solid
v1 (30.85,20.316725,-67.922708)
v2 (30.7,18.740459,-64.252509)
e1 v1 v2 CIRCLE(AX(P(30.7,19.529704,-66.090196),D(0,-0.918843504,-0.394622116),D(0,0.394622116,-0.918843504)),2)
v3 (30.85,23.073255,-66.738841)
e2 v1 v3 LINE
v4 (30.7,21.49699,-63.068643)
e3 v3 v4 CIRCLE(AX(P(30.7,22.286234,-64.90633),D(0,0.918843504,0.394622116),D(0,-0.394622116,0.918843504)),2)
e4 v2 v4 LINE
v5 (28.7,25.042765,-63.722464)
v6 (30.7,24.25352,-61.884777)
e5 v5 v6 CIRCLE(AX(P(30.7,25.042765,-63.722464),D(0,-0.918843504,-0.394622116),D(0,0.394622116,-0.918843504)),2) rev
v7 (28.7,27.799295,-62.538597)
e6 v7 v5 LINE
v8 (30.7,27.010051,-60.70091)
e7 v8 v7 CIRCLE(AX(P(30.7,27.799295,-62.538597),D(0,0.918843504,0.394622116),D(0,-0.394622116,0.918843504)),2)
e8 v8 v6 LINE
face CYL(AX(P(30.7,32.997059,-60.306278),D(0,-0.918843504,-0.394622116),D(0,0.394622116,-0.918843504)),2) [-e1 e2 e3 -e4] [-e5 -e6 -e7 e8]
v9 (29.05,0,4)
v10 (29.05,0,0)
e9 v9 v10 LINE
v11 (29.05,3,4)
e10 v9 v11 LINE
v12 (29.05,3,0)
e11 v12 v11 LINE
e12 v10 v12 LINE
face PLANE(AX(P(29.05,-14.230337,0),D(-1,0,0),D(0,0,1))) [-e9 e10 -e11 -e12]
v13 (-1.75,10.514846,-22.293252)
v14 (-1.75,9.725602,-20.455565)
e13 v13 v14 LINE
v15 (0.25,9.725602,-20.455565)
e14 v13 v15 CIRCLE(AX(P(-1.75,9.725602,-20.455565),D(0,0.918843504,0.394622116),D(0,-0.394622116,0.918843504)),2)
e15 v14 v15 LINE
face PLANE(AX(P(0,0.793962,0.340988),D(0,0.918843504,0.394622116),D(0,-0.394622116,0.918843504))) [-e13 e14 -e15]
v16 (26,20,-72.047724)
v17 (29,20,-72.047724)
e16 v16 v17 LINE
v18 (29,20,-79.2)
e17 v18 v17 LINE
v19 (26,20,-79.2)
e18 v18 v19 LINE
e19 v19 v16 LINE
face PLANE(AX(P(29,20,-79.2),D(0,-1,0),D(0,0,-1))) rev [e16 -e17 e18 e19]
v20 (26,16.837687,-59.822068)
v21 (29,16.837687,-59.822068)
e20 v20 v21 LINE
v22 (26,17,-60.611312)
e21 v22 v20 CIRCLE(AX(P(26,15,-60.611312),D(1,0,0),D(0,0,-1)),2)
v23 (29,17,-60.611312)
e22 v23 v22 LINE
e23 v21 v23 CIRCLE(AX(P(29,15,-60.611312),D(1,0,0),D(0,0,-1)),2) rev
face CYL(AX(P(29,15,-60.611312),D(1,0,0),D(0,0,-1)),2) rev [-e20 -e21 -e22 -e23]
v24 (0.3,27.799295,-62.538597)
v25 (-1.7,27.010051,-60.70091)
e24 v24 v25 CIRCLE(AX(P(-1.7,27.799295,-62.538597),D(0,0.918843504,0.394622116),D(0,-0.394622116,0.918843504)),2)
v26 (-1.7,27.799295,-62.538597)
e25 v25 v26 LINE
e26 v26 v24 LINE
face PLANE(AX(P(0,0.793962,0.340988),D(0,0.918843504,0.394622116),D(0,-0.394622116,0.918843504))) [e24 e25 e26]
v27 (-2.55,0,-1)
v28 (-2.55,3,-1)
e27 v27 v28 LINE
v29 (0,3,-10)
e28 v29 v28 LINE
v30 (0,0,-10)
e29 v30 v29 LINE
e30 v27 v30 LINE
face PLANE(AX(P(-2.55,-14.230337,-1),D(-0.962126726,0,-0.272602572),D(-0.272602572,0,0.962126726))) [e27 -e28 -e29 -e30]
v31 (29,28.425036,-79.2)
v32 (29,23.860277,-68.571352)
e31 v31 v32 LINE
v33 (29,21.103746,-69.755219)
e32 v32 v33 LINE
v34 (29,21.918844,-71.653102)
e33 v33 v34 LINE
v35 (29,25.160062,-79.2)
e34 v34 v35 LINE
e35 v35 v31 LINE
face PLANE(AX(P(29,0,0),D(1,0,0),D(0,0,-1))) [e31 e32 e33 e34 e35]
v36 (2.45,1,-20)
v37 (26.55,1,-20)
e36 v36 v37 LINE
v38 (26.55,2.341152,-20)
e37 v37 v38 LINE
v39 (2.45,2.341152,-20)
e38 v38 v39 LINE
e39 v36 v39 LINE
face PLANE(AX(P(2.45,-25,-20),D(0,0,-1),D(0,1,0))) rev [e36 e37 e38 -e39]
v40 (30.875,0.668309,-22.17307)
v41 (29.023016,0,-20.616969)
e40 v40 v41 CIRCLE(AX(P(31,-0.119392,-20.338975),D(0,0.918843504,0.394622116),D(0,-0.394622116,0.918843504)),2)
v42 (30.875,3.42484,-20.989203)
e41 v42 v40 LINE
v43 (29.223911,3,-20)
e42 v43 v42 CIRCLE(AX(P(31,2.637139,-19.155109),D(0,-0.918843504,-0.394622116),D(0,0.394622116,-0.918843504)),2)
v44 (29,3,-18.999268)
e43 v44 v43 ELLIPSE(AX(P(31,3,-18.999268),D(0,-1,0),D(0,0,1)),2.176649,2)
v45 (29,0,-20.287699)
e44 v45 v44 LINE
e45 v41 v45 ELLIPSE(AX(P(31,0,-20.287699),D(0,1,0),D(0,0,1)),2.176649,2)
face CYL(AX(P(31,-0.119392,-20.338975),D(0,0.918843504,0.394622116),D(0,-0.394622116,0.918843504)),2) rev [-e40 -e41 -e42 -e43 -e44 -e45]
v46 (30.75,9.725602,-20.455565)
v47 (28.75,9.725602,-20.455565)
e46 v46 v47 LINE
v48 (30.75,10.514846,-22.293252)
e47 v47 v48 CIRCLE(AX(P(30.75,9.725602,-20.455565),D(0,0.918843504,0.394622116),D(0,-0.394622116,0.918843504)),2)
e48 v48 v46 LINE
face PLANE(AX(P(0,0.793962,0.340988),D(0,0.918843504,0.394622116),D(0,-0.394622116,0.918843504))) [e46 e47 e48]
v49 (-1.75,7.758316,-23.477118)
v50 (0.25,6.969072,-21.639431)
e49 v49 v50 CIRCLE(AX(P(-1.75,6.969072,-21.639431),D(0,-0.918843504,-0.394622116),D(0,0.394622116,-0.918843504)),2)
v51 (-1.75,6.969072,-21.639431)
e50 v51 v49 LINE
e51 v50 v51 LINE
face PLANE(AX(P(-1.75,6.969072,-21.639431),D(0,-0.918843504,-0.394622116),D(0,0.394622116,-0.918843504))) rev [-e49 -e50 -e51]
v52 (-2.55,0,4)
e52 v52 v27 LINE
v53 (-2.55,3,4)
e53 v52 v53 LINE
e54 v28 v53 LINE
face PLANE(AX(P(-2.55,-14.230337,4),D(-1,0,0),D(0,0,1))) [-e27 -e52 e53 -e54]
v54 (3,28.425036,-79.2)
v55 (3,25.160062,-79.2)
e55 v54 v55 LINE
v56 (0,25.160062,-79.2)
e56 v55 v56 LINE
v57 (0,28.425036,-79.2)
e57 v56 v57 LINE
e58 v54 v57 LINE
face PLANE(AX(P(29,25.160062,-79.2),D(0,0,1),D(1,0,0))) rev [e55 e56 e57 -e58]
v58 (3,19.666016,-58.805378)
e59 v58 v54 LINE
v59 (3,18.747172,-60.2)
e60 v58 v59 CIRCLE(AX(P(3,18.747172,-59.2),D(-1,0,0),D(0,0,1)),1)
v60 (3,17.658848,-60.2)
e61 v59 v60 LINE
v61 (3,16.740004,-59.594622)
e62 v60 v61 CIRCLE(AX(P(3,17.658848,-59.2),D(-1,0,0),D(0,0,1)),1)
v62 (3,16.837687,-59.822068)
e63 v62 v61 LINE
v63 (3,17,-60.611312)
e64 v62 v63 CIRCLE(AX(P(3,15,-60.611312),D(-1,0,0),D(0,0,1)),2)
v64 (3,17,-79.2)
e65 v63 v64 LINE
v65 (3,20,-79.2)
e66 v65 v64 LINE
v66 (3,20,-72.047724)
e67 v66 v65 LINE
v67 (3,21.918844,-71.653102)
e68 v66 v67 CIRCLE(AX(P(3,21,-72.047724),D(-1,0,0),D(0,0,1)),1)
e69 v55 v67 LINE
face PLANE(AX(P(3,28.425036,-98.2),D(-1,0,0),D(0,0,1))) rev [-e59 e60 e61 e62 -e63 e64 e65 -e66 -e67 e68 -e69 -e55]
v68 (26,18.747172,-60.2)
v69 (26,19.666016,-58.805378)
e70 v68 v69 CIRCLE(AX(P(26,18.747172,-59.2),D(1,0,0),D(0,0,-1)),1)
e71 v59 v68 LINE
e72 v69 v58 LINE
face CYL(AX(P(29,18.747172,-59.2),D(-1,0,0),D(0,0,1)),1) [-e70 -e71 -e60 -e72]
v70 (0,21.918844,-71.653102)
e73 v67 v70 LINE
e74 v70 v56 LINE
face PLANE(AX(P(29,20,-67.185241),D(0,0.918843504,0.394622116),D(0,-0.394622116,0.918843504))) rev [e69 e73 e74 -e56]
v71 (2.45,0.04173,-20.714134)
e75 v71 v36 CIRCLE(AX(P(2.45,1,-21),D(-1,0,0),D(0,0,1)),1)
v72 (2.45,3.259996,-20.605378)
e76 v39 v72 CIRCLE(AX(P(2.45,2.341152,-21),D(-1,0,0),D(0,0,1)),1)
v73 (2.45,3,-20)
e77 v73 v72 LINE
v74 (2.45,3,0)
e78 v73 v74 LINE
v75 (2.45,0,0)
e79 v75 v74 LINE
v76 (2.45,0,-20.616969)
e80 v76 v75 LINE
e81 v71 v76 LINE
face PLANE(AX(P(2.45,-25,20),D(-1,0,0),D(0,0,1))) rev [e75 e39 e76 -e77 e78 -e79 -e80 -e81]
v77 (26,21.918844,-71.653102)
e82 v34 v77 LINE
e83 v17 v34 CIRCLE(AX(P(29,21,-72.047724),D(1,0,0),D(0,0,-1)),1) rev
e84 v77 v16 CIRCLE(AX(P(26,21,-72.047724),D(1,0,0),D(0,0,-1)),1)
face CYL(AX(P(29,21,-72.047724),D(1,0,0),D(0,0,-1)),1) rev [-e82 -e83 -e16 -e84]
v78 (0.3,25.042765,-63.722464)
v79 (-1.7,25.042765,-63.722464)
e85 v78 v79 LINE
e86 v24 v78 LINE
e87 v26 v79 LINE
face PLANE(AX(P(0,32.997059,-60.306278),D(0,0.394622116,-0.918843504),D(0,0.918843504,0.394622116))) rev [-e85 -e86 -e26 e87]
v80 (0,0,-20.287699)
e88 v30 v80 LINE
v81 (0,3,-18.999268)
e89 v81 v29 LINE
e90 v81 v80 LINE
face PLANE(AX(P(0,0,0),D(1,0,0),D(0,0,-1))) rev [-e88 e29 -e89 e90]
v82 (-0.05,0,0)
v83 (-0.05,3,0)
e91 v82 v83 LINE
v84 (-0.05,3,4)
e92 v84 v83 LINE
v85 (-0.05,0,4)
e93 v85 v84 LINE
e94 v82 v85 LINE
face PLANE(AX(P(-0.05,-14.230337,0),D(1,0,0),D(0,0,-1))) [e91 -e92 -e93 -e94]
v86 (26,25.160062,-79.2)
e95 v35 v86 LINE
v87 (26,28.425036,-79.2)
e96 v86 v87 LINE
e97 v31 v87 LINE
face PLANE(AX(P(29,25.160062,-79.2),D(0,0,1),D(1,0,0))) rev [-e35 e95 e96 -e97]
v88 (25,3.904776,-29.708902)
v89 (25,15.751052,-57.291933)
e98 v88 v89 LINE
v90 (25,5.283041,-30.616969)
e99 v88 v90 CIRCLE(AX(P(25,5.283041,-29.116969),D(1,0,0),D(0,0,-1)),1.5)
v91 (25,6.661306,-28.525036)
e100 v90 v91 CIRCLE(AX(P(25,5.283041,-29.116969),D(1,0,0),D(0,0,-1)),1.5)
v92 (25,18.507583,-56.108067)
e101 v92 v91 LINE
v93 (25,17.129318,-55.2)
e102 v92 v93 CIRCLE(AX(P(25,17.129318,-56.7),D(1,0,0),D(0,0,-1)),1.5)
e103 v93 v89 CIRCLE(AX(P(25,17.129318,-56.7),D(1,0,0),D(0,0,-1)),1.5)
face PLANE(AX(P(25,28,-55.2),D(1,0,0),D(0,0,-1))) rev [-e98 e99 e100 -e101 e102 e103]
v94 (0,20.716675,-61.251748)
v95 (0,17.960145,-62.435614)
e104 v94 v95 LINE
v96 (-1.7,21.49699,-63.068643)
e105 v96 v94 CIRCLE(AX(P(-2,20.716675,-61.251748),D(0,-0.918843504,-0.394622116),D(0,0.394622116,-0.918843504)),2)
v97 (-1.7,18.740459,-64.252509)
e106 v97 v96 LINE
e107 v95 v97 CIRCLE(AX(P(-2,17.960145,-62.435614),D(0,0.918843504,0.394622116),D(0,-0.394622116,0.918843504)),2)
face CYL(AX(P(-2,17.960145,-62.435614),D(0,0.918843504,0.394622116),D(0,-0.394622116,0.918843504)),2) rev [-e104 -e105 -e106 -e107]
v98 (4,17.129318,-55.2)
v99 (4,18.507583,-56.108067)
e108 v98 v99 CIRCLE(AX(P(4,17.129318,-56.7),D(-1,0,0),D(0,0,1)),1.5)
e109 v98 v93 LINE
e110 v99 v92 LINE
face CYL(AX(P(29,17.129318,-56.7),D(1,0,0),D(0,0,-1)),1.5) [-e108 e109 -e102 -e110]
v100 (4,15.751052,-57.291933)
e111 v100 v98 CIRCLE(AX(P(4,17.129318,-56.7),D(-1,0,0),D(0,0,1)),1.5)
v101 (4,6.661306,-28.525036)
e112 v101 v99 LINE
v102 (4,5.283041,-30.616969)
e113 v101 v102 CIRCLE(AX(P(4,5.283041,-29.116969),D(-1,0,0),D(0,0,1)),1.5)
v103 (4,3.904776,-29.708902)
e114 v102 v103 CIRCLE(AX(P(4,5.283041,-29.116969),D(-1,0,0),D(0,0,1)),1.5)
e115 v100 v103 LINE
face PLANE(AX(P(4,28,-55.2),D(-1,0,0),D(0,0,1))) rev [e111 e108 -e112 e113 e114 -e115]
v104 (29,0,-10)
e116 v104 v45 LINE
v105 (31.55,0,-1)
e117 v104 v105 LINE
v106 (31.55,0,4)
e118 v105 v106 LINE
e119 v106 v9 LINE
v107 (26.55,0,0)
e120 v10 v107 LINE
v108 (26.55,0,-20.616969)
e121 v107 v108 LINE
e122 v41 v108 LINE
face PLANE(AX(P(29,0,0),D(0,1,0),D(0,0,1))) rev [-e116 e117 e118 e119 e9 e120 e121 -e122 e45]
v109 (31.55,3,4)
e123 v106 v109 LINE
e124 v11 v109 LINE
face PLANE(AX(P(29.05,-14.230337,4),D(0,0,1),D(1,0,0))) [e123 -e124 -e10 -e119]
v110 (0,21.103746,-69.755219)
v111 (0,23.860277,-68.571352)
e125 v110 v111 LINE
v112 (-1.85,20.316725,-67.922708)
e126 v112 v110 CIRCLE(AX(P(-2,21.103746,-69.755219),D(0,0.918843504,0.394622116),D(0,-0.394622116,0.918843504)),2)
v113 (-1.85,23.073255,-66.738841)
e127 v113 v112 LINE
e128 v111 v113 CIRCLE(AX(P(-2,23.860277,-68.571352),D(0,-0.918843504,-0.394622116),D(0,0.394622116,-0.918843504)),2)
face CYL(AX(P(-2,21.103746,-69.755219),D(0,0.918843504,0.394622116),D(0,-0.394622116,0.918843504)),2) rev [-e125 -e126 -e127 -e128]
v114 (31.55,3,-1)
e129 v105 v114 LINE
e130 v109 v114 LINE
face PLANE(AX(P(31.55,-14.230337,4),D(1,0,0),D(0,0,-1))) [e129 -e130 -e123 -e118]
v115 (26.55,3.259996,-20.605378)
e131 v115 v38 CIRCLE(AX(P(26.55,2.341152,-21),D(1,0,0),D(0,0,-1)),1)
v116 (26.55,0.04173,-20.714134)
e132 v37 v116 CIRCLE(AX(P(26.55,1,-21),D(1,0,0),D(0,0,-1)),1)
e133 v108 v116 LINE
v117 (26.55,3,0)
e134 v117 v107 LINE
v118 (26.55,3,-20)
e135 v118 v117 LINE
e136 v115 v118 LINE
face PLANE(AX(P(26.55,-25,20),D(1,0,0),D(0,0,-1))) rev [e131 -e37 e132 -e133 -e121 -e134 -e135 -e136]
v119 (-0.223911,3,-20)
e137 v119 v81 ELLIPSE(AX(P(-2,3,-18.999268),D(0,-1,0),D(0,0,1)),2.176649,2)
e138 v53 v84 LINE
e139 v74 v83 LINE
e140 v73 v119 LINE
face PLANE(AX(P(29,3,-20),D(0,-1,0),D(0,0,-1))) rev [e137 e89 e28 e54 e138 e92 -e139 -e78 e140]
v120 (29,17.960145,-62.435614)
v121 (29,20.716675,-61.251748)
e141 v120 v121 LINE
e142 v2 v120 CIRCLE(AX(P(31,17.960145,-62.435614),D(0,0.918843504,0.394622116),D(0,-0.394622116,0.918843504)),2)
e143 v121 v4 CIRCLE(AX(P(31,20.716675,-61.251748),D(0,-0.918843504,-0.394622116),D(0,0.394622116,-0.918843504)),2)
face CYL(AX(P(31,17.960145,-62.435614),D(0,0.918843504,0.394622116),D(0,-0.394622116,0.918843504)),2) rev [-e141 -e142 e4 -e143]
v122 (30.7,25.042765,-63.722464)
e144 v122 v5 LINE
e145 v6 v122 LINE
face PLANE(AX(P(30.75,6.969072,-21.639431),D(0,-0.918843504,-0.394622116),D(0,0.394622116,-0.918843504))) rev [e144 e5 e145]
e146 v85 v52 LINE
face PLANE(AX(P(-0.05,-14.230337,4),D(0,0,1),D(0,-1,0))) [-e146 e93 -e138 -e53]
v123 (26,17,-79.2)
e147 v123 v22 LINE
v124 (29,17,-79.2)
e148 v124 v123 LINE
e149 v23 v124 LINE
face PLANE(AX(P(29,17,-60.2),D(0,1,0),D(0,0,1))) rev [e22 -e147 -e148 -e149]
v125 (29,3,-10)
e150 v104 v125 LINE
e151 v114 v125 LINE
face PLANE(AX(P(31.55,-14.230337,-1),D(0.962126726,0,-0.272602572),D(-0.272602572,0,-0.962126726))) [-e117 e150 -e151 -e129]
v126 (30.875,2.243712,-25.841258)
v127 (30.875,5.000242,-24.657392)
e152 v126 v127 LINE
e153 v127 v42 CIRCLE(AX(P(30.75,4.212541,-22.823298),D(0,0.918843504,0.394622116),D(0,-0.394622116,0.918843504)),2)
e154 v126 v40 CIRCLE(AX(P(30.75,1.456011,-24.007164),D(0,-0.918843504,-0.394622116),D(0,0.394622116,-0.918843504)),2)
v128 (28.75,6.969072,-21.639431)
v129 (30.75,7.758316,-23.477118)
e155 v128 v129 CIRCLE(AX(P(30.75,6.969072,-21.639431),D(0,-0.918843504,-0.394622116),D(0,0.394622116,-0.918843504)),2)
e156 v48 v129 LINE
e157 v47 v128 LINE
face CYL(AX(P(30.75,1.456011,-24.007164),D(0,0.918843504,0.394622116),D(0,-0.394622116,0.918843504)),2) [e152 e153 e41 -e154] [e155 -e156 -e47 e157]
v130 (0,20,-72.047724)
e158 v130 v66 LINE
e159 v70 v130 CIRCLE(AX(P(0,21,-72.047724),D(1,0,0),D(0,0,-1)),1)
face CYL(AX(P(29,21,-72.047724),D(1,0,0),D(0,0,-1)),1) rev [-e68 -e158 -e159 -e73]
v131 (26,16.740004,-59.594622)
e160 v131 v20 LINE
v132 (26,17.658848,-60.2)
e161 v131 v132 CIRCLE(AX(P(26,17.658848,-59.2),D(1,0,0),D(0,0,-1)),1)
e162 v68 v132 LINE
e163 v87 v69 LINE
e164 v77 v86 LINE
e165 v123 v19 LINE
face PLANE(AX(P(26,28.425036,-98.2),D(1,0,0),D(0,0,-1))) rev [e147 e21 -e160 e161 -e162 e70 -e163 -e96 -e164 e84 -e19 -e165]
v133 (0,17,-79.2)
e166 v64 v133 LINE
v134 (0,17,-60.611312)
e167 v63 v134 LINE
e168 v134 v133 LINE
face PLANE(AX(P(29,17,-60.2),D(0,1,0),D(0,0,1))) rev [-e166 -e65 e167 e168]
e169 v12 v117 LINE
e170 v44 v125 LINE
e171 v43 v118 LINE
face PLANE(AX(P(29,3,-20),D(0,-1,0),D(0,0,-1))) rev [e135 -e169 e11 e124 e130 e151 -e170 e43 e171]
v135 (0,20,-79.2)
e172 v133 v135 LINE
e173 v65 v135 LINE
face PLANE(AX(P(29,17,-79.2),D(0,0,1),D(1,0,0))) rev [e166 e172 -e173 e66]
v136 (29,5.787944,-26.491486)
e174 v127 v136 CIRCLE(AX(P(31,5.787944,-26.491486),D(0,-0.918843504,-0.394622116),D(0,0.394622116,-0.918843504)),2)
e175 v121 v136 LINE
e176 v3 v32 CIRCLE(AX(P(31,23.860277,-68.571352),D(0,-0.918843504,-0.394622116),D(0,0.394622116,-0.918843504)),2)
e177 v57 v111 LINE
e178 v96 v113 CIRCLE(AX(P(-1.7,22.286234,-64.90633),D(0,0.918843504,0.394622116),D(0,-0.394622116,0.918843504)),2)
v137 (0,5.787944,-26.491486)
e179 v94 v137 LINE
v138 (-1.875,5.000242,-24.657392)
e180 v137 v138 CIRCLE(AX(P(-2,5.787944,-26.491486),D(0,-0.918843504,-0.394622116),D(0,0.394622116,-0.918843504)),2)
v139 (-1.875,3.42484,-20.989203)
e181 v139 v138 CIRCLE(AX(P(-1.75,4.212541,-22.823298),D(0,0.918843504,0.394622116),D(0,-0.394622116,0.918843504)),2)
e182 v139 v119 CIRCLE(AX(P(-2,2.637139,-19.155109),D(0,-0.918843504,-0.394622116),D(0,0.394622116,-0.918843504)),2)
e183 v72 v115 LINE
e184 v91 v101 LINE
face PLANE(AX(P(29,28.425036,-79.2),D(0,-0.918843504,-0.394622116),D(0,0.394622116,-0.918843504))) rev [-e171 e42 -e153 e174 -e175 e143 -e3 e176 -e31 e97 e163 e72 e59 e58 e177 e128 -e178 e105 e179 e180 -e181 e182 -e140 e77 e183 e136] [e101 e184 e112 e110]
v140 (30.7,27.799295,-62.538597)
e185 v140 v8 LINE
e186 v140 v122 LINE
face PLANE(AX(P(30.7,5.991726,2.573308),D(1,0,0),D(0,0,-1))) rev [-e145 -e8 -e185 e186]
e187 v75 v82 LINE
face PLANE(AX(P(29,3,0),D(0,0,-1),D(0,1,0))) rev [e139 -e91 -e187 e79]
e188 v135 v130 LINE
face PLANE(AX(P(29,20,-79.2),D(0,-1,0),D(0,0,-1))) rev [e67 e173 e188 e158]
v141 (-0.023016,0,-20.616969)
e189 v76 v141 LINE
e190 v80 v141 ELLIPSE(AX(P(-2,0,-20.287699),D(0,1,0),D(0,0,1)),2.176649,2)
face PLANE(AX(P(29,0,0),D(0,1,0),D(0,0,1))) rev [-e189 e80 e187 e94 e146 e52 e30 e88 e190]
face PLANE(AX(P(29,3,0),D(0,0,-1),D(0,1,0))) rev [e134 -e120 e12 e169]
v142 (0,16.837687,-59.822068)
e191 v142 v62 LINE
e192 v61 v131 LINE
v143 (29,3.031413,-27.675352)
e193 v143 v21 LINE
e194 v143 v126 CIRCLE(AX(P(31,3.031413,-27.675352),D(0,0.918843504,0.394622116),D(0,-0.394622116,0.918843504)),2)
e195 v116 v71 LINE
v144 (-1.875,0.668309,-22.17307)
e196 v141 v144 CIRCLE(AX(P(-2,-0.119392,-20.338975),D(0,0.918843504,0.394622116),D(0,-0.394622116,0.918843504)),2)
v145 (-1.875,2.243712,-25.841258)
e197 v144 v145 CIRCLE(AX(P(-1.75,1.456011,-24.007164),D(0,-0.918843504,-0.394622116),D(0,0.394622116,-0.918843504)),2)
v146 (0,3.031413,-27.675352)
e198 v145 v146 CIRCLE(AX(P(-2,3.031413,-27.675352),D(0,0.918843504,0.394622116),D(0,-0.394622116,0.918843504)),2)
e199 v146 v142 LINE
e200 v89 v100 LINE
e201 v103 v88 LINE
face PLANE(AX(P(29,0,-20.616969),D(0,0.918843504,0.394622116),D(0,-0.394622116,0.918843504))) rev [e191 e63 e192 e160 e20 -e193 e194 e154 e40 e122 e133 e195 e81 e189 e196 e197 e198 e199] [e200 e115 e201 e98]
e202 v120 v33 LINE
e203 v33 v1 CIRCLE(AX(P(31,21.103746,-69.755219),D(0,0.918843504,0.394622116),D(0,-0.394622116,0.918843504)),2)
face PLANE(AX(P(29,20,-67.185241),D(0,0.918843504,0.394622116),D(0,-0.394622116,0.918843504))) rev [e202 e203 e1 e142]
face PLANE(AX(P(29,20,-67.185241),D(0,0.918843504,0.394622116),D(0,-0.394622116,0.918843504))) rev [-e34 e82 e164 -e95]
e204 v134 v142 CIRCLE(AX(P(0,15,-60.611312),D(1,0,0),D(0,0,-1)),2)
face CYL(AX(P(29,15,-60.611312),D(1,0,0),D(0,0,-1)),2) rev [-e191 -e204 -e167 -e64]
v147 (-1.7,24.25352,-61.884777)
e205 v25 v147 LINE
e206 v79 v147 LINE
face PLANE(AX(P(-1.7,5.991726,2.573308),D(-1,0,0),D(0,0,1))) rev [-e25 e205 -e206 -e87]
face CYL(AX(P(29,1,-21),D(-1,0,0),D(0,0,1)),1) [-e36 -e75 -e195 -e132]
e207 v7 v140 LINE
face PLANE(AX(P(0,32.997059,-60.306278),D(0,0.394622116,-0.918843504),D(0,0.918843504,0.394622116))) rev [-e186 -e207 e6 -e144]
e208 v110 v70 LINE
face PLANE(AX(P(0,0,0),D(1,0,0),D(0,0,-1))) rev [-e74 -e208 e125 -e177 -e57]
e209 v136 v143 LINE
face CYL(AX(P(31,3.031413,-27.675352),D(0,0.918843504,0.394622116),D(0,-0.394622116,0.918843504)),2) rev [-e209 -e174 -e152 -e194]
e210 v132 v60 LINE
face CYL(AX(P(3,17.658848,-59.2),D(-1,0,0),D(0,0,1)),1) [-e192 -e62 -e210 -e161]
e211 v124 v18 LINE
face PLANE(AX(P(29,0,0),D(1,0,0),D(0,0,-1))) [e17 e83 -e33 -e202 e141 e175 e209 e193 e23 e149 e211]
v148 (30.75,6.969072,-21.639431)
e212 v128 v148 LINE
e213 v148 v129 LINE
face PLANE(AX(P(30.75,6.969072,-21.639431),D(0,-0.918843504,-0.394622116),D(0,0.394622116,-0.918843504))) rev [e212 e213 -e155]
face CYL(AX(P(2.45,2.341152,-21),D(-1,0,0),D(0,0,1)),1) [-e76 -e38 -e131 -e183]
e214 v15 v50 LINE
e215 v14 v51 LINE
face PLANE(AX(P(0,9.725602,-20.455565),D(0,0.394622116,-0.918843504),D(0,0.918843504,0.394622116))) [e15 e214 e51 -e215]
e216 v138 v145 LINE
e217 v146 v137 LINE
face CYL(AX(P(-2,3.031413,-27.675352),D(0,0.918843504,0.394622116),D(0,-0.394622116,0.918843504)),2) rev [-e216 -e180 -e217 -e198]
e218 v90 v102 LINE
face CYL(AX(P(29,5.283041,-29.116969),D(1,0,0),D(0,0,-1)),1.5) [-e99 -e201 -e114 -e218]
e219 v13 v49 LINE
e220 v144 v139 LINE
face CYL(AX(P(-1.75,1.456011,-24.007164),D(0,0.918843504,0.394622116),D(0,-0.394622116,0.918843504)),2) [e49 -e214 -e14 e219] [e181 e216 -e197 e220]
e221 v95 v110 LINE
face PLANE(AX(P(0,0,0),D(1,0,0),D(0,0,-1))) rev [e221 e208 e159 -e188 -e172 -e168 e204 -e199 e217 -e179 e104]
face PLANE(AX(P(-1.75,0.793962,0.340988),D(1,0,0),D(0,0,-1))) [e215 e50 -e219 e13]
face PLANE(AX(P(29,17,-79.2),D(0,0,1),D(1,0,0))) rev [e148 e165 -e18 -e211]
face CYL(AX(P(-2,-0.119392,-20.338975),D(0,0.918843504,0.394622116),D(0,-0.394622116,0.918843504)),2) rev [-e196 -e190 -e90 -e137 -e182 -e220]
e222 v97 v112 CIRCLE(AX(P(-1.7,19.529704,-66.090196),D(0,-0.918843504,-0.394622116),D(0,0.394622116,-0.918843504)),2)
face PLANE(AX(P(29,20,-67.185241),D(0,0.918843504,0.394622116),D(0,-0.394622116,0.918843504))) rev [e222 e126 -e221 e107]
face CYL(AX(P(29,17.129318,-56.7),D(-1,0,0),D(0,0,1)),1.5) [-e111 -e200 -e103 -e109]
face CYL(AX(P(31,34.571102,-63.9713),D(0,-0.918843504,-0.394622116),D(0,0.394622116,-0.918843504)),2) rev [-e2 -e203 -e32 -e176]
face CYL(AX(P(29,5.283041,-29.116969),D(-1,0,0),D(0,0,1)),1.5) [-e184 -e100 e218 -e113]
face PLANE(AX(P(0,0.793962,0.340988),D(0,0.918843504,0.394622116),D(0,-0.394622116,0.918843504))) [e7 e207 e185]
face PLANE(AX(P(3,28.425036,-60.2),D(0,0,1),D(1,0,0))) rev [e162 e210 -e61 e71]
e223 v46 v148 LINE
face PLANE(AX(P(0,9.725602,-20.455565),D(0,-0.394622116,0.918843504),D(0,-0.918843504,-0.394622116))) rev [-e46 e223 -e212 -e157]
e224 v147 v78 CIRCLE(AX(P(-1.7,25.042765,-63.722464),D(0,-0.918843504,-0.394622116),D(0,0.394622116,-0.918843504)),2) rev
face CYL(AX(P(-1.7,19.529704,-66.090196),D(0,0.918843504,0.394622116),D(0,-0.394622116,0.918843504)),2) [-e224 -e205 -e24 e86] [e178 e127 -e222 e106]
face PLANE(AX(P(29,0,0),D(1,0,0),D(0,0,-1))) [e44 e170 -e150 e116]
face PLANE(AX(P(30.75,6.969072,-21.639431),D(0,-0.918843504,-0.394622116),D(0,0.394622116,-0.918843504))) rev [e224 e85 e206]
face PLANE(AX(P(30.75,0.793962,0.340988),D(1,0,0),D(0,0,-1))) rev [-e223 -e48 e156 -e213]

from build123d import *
from build123d.topology import SkipClean

# Parameters (mm, degrees)
BOSS_EXTRUDE1_DEPTH   = 29
SKETCH2_W             = 24.1
SKETCH2_H             = 40
CUT_EXTRUDE1_DEPTH    = 28
SKETCH3_W             = 21
SKETCH3_H             = 24.583031318
CUT_EXTRUDE2_DEPTH    = 28
SKETCH4_W             = 23
SKETCH4_H             = 38
CUT_EXTRUDE3_DEPTH    = 87.03859599
BOSS_EXTRUDE2_DEPTH   = 6
BOSS_EXTRUDE2_2_DEPTH = 6
SKETCH7_R             = 2
BOSS_EXTRUDE3_DEPTH   = 3
SKETCH8_R             = 2
BOSS_EXTRUDE4_DEPTH   = 3
FILLET5_R             = 1
FILLET1_R             = 2
BOSS_EXTRUDE5_DEPTH   = 6
BOSS_EXTRUDE5_2_DEPTH = 6
SKETCH10_R            = 2
BOSS_EXTRUDE6_DEPTH   = 3
SKETCH11_R            = 2
BOSS_EXTRUDE7_DEPTH   = 3
FILLET2_R             = 2
FILLET3_R             = 1
FILLET4_R             = 1.5
FILLET6_R             = 1
FILLET7_R             = 1
BOSS_EXTRUDE8_DEPTH   = 3


# Some blends are built 0.0001 mm under size
with BuildPart() as part:
    # Sketch1 → Boss-Extrude1 (new body)
    with BuildSketch(Plane(origin=(0, 0, 0), x_dir=(0, 0, -1), z_dir=(1, 0, 0))):
        Polygon((0, 0), (20.616968682, 0), (60.2, 17), (79.2, 17), (79.2, 20), (67.185240821, 20), (79.2, 25.16006226), (79.2, 28.425036095), (20, 3), (0, 3), align=None)
    extrude(amount=BOSS_EXTRUDE1_DEPTH)

    # Sketch2 → Cut-Extrude1 (cut)
    with BuildSketch(Plane(origin=(0, 3, 0), x_dir=(1, 0, 0), z_dir=(0, 1, 0))):
        with Locations((14.5, 0)):
            Rectangle(SKETCH2_W, SKETCH2_H)
    extrude(amount=-CUT_EXTRUDE1_DEPTH, mode=Mode.SUBTRACT)

    # Sketch3 → Cut-Extrude2 (cut)
    with BuildSketch(Plane.XZ):
        with Locations((14.5, -42.908484341)):
            Rectangle(SKETCH3_W, SKETCH3_H)
    extrude(amount=-CUT_EXTRUDE2_DEPTH, mode=Mode.SUBTRACT)

    # Sketch4 → Cut-Extrude3 (cut, through all)
    with BuildSketch(Plane.XZ.offset(-17)):
        with Locations((14.5, -79.2)):
            Rectangle(SKETCH4_W, SKETCH4_H)
    extrude(amount=-CUT_EXTRUDE3_DEPTH, mode=Mode.SUBTRACT)



with BuildPart() as body_2:
    # Sketch6 → Boss-Extrude2 (new body)
    with BuildSketch(Plane(origin=(0, -4.719099202, -2.026744384), x_dir=(1, 0, 0), z_dir=(0, 0.9188435044080576, 0.3946221159630054))):
        with BuildLine():
            Line((-1.75, 22.633400601), (-1.75, 24.633400601))
            ThreePointArc((-1.75, 24.633400601), (-3.164213562, 21.219187039), (0.25, 22.633400601))
            Line((0.25, 22.633400601), (-1.75, 22.633400601))
        make_face()
    extrude(amount=BOSS_EXTRUDE2_DEPTH)


with BuildPart() as body_3:
    # Sketch6 → Boss-Extrude2 2 (new body)
    with BuildSketch(Plane(origin=(0, -4.719099202, -2.026744384), x_dir=(1, 0, 0), z_dir=(0, 0.9188435044080576, 0.3946221159630054))):
        with BuildLine():
            ThreePointArc((28.75, 22.633400601), (32.164213562, 21.219187039), (30.75, 24.633400601))
            Line((30.75, 24.633400601), (30.75, 22.633400601))
            Line((30.75, 22.633400601), (28.75, 22.633400601))
        make_face()
    extrude(amount=BOSS_EXTRUDE2_2_DEPTH)


    with SkipClean():  # the faces are left unmerged after this step: merging them gives an invalid solid
        add(body_2.part)  # Boss-Extrude3 merges body 2
        # Sketch7 → Boss-Extrude3 (add)
        with BuildSketch(Plane(origin=(0, -4.719099202, -2.026744384), x_dir=(1, 0, 0), z_dir=(0, -0.9188435044080577, -0.39462211596300556))):
            with Locations(Location((30.75, -22.633400601, 0), (0, 0, 270))):
                Circle(SKETCH7_R)
            with Locations(Location((-1.75, -22.633400601, 0), (0, 0, 270))):
                Circle(SKETCH7_R)
        extrude(amount=-BOSS_EXTRUDE3_DEPTH)


with BuildPart() as part_1:
    add(part.part)

    add(body_3.part)  # Boss-Extrude4 merges body 3
    # Sketch8 → Boss-Extrude4 (add)
    with BuildSketch(Plane(origin=(0, -4.719099202, -2.026744384), x_dir=(1, 0, 0), z_dir=(0, -0.9188435044080577, -0.39462211596300556))):
        with BuildLine():
            Line((30.75, -20.633400601), (-1.75, -20.633400601))
            ThreePointArc((-1.75, -20.633400601), (-0.335786438, -21.219187039), (0.25, -22.633400601))
            ThreePointArc((0.25, -22.633400601), (-0.335786438, -24.047614164), (-1.75, -24.633400601))
            Line((-1.75, -24.633400601), (30.75, -24.633400601))
            ThreePointArc((30.75, -24.633400601), (28.75, -22.633400601), (30.75, -20.633400601))
        make_face()
        with Locations(Location((30.75, -22.633400601, 0), (0, 0, 270))):
            Circle(SKETCH8_R)
        with Locations(Location((-1.75, -22.633400601, 0), (0, 0, 270))):
            Circle(SKETCH8_R)
    extrude(amount=BOSS_EXTRUDE4_DEPTH)

    # Fillet5
    fillet5_edges = [part_1.edges().sort_by_distance(p)[0] for p in [
        (14.5, 17, -60.2),
    ]]
    fillet(fillet5_edges, radius=FILLET5_R)

    # Fillet1
    # the kernel refuses this fillet: 2 mm, written as the material it adds along each edge
    with BuildSketch(Plane(origin=(0, 17, -60.2), x_dir=(0, -0.39462211596300395, 0.9188435044080584), z_dir=(1, 0, 0)), Plane(origin=(26, 17, -60.2), x_dir=(0, -0.39462211596300395, 0.9188435044080584), z_dir=(1, 0, 0))) as fillet1_piece_1:
        with BuildLine():
            CenterArc((FILLET1_R * 0.205656227335, FILLET1_R), FILLET1_R, 246.757591511, 23.242408489)
            Line((-FILLET1_R * 0.188965888628, FILLET1_R * 0.0811564955919), (0, 0))
            Line((0, 0), (FILLET1_R * 0.205656227335, 0))
        make_face()
    extrude(amount=3)
    with BuildSketch(Plane(origin=(29, 0.666766489, -22.169476849), x_dir=(0.9999978256192742, 0.000822932051561906, -0.0019161261864445022), z_dir=(0, 0.9188435044080576, 0.3946221159630056))) as fillet1_piece_2_section:
        with BuildLine():
            CenterArc((1.995841225, -1.996346258), FILLET1_R, 93.463838868, 86.416678302)
            Line((-0.004154427, -1.992175524), (-0.204153992, -1.99175845))
            Line((-0.204153992, -1.99175845), (-0.199999565, 0.000417073))
            Line((-0.199999565, 0.000417073), (0.000417073, 0.199999565))
            ThreePointArc((0.000417073, 0.199999565), (1.750413268, 0.196350172), (1.862920362, 0.199634626))
            Line((1.862920362, 0.199634626), (1.875004077, 0))
        make_face()
    fillet1_piece_2 = extrude(amount=7.980449639, mode=Mode.PRIVATE)
    fillet1_piece_2 = split(fillet1_piece_2, bisect_by=Plane(origin=(29, 0, -22.169476849), z_dir=(0, 1, 0)), keep=Keep.TOP, mode=Mode.PRIVATE)
    fillet1_piece_2 = split(fillet1_piece_2, bisect_by=Plane(origin=(29, 3, -22.169476849), z_dir=(0, -1, 0)), keep=Keep.TOP, mode=Mode.PRIVATE)
    add(fillet1_piece_2)
    with BuildSketch(Plane(origin=(29, -3.909487311, -24.134872424), x_dir=(0.9999978256192742, 0.000822932051561906, -0.0019161261864445022), z_dir=(0, 0.9188435044080576, 0.3946221159630056))) as fillet1_piece_3_section:
        with BuildLine():
            CenterArc((1.995841225, -1.996346258), FILLET1_R, 93.463838868, 86.416678302)
            Line((-0.004154427, -1.992175524), (-0.204153992, -1.99175845))
            Line((-0.204153992, -1.99175845), (-0.199999565, 0.000417073))
            Line((-0.199999565, 0.000417073), (0.000417073, 0.199999565))
            ThreePointArc((0.000417073, 0.199999565), (1.750413268, 0.196350172), (1.862920362, 0.199634626))
            Line((1.862920362, 0.199634626), (1.875004077, 0))
        make_face()
    fillet1_piece_3 = extrude(amount=7.980449639, mode=Mode.PRIVATE)
    fillet1_piece_3 = split(fillet1_piece_3, bisect_by=Plane(origin=(29, 3, -24.134872424), z_dir=(0, 1, 0)), keep=Keep.TOP, mode=Mode.PRIVATE)
    add(fillet1_piece_3)
    with BuildSketch(Plane(origin=(29, 5.001785466, -24.660984518), x_dir=(0, 0.3946221159630056, -0.9188435044080575), z_dir=(0, -0.9188435044080576, -0.3946221159630056))) as fillet1_piece_4:
        with BuildLine():
            CenterArc((1.992179856, 2), FILLET1_R, 183.583321698, 86.416678302)
            Line((-0.003910072, 1.875), (-0.203519065, 1.8625))
            ThreePointArc((-0.203519065, 1.8625), (-0.2, 1.75), (-0.2, 0))
            Line((-0.2, 0), (0, -0.2))
            Line((0, -0.2), (1.992179856, -0.2))
            Line((1.992179856, -0.2), (1.992179856, 0))
        make_face()
    extrude(amount=3)
    with BuildSketch(Plane(origin=(0, 5.001785466, -24.660984518), x_dir=(0, 0.3946221159630056, -0.9188435044080576), z_dir=(0, -0.9188435044080576, -0.3946221159630056))) as fillet1_piece_5:
        with BuildLine():
            CenterArc((1.992179856, -2), FILLET1_R, 90, 86.416678302)
            Line((-0.003910072, -1.875), (-0.203519065, -1.8625))
            ThreePointArc((-0.203519065, -1.8625), (-0.2, -1.75), (-0.2, 0))
            Line((-0.2, 0), (0, 0.2))
            Line((0, 0.2), (1.992179856, 0.2))
            Line((1.992179856, 0.2), (1.992179856, 0))
        make_face()
    extrude(amount=3)
    with BuildSketch(Plane(origin=(0, 0.666766489, -22.169476849), x_dir=(-0.9999978256192742, 0.0008229320515609999, -0.0019161261864423925), z_dir=(0, 0.9188435044080576, 0.3946221159630056))) as fillet1_piece_6_section:
        with BuildLine():
            CenterArc((1.995841225, 1.996346258), FILLET1_R, 180.119482831, 86.416678302)
            Line((-0.004154427, 1.992175524), (-0.204153992, 1.99175845))
            Line((-0.204153992, 1.99175845), (-0.199999565, -0.000417073))
            Line((-0.199999565, -0.000417073), (0.000417073, -0.199999565))
            ThreePointArc((0.000417073, -0.199999565), (1.750413268, -0.196350172), (1.862920362, -0.199634626))
            Line((1.862920362, -0.199634626), (1.875004077, 0))
        make_face()
    fillet1_piece_6 = extrude(amount=7.980449639, mode=Mode.PRIVATE)
    fillet1_piece_6 = split(fillet1_piece_6, bisect_by=Plane(origin=(0, 0, -22.169476849), z_dir=(0, 1, 0)), keep=Keep.TOP, mode=Mode.PRIVATE)
    fillet1_piece_6 = split(fillet1_piece_6, bisect_by=Plane(origin=(0, 3, -22.169476849), z_dir=(0, -1, 0)), keep=Keep.TOP, mode=Mode.PRIVATE)
    add(fillet1_piece_6)
    with BuildSketch(Plane(origin=(0, -3.909487311, -24.134872424), x_dir=(-0.9999978256192742, 0.0008229320515609999, -0.0019161261864423925), z_dir=(0, 0.9188435044080576, 0.3946221159630056))) as fillet1_piece_7_section:
        with BuildLine():
            CenterArc((1.995841225, 1.996346258), FILLET1_R, 180.119482831, 86.416678302)
            Line((-0.004154427, 1.992175524), (-0.204153992, 1.99175845))
            Line((-0.204153992, 1.99175845), (-0.199999565, -0.000417073))
            Line((-0.199999565, -0.000417073), (0.000417073, -0.199999565))
            ThreePointArc((0.000417073, -0.199999565), (1.750413268, -0.196350172), (1.862920362, -0.199634626))
            Line((1.862920362, -0.199634626), (1.875004077, 0))
        make_face()
    fillet1_piece_7 = extrude(amount=7.980449639, mode=Mode.PRIVATE)
    fillet1_piece_7 = split(fillet1_piece_7, bisect_by=Plane(origin=(0, 3, -24.134872424), z_dir=(0, 1, 0)), keep=Keep.TOP, mode=Mode.PRIVATE)
    add(fillet1_piece_7)



with BuildPart() as body_2_2:
    # Sketch9 → Boss-Extrude5 (new body)
    with BuildSketch(Plane(origin=(0, -4.719099202, -2.026744384), x_dir=(1, 0, 0), z_dir=(0, 0.9188435044080577, 0.39462211596300545))):
        with BuildLine():
            ThreePointArc((0.3, 68.433400601), (-3.114213562, 69.847614164), (-1.7, 66.433400601))
            Line((-1.7, 66.433400601), (-1.7, 68.433400601))
            Line((-1.7, 68.433400601), (0.3, 68.433400601))
        make_face()
    extrude(amount=BOSS_EXTRUDE5_DEPTH)



with BuildPart() as body_3_2:
    # Sketch9 → Boss-Extrude5 2 (new body)
    with BuildSketch(Plane(origin=(0, -4.719099202, -2.026744384), x_dir=(1, 0, 0), z_dir=(0, 0.9188435044080577, 0.39462211596300545))):
        with BuildLine():
            ThreePointArc((30.7, 66.433400601), (32.114213562, 69.847614164), (28.7, 68.433400601))
            Line((28.7, 68.433400601), (30.7, 68.433400601))
            Line((30.7, 68.433400601), (30.7, 66.433400601))
        make_face()
    extrude(amount=BOSS_EXTRUDE5_2_DEPTH)


with BuildPart() as body_2_2_1:
    with SkipClean():  # the faces are left unmerged after this step: merging them gives an invalid solid
        add(body_2_2.part)

        add(body_3_2.part)  # Boss-Extrude6 merges body 3 2
        # Sketch10 → Boss-Extrude6 (add)
        with BuildSketch(Plane(origin=(0, -4.719099202, -2.026744384), x_dir=(1, 0, 0), z_dir=(0, -0.9188435044080576, -0.3946221159630054))):
            with Locations(Location((30.7, -68.433400601, 0), (0, 0, 90))):
                Circle(SKETCH10_R)
            with Locations(Location((-1.7, -68.433400601, 0), (0, 0, 90))):
                Circle(SKETCH10_R)
        extrude(amount=-BOSS_EXTRUDE6_DEPTH)


with BuildPart() as part_2:
    add(part_1.part)

    add(body_2_2_1.part)  # Boss-Extrude7 merges body 2 2
    # Sketch11 → Boss-Extrude7 (add)
    with BuildSketch(Plane(origin=(0, -4.719099202, -2.026744384), x_dir=(1, 0, 0), z_dir=(0, -0.9188435044080576, -0.3946221159630054))):
        with BuildLine():
            ThreePointArc((0.3, -68.433400601), (-0.285786438, -69.847614164), (-1.7, -70.433400601))
            Line((-1.7, -70.433400601), (3, -70.433400601))
            Line((3, -70.433400601), (3, -66.433400601))
            Line((3, -66.433400601), (-1.7, -66.433400601))
            ThreePointArc((-1.7, -66.433400601), (-0.285786438, -67.019187039), (0.3, -68.433400601))
        make_face()
        with Locations(Location((-1.7, -68.433400601, 0), (0, 0, 90))):
            Circle(SKETCH11_R)
        with BuildLine():
            Line((26, -66.433400601), (26, -70.433400601))
            Line((26, -70.433400601), (30.7, -70.433400601))
            ThreePointArc((30.7, -70.433400601), (28.7, -68.433400601), (30.7, -66.433400601))
            Line((30.7, -66.433400601), (26, -66.433400601))
        make_face()
        with Locations(Location((30.7, -68.433400601, 0), (0, 0, 90))):
            Circle(SKETCH11_R)
    extrude(amount=BOSS_EXTRUDE7_DEPTH)

    # Fillet2
    # the kernel refuses this fillet: 2 mm, written as the material it adds along each edge
    with BuildSketch(Plane(origin=(0, 21.496989914, -63.068643003), x_dir=(0, -0.3946221159630054, 0.9188435044080576), z_dir=(0, -0.9188435044080577, -0.39462211596300545)), Plane(origin=(29, 18.740459401, -64.252509351), x_dir=(0, -0.39462211596300545, 0.9188435044080577), z_dir=(0, 0.9188435044080577, 0.39462211596300545))) as fillet2_piece_1:
        with BuildLine():
            CenterArc((1.977371993, 2), FILLET2_R, 188.626926559, 81.373073441)
            Line((0, 1.7), (0, 0))
            Line((0, 0), (1.977371993, 0))
        make_face()
    extrude(amount=3)
    with BuildSketch(Plane(origin=(0, 20.318947864, -67.927883368), x_dir=(-0.9999953645423342, -0.0012015510438305793, 0.0027977077998891206), z_dir=(0, 0.9188435044080577, 0.39462211596300545)), Plane(origin=(29, 23.075478378, -66.74401702), x_dir=(0.9999953645423341, -0.001201551043837046, 0.0027977077999041767), z_dir=(0, -0.9188435044080577, -0.39462211596300545))) as fillet2_piece_2:
        with BuildLine():
            CenterArc((1.993935403, -1.994814545), FILLET2_R, 94.126767029, 85.698777695)
            Line((-0.006055326, -1.988724916), (-0.206054399, -1.988115953))
            Line((-0.206054399, -1.988115953), (-0.199999073, 0.000608963))
            Line((-0.199999073, 0.000608963), (0.000608963, 0.199999073))
            ThreePointArc((0.000608963, 0.199999073), (1.700601083, 0.194822889), (1.835615893, 0.199481454))
            Line((1.835615893, 0.199481454), (1.850008576, 0))
        make_face()
    extrude(amount=3)

    # Fillet3
    # the kernel refuses this fillet: 1 mm, written as the material it adds along each edge
    with BuildSketch(Plane(origin=(26, 20, -67.185240821), x_dir=(0, 0, -1), z_dir=(1, 0, 0))) as fillet3_piece_1:
        with BuildLine():
            CenterArc((FILLET3_R * 4.86248344122, FILLET3_R), FILLET3_R, 113.242408489, 156.757591511)
            Line((FILLET3_R * 4.46786132525, FILLET3_R * 1.91884350441), (FILLET3_R * 4.45996888293, FILLET3_R * 1.9372203745))
            Line((FILLET3_R * 4.45996888293, FILLET3_R * 1.9372203745), (-FILLET3_R * 0.00789244231926, FILLET3_R * 0.0183768700882))
            Line((-FILLET3_R * 0.00789244231926, FILLET3_R * 0.0183768700882), (0, -FILLET3_R * 0.02))
            Line((0, -FILLET3_R * 0.02), (FILLET3_R * 4.86248344122, -FILLET3_R * 0.02))
            Line((FILLET3_R * 4.86248344122, -FILLET3_R * 0.02), (FILLET3_R * 4.86248344122, 0))
        make_face()
    extrude(amount=3)
    with BuildSketch(Plane(origin=(0, 20, -67.185240821), x_dir=(0, 0.39462211596300517, -0.9188435044080577), z_dir=(1, 0, 0))) as fillet3_piece_2:
        with BuildLine():
            CenterArc((FILLET3_R * 4.86248344122, -FILLET3_R), FILLET3_R, 90, 156.757591511)
            Line((FILLET3_R * 4.46786132525, -FILLET3_R * 1.91884350441), (FILLET3_R * 4.45996888293, -FILLET3_R * 1.9372203745))
            Line((FILLET3_R * 4.45996888293, -FILLET3_R * 1.9372203745), (-FILLET3_R * 0.00789244231926, -FILLET3_R * 0.0183768700882))
            Line((-FILLET3_R * 0.00789244231926, -FILLET3_R * 0.0183768700882), (0, FILLET3_R * 0.02))
            Line((0, FILLET3_R * 0.02), (FILLET3_R * 4.86248344122, FILLET3_R * 0.02))
            Line((FILLET3_R * 4.86248344122, FILLET3_R * 0.02), (FILLET3_R * 4.86248344122, 0))
        make_face()
    extrude(amount=3)

    # Fillet4
    fillet4_edges = [part_2.edges().sort_by_distance(p)[0] for p in [
        (14.5, 7.559743445, -30.616968682),
        (14.5, 18.117589029, -55.2),
        (14.5, 14.852615195, -55.2),
        (14.5, 4.294769611, -30.616968682),
    ]]
    fillet(fillet4_edges, radius=FILLET4_R - 0.0001)  # a hair under: the kernel refuses the full size

    # Fillet6
    fillet6_edges = [part_2.edges().sort_by_distance(p)[0] for p in [
        (14.5, 20.264973835, -60.2),
    ]]
    fillet(fillet6_edges, radius=FILLET6_R)

    # Fillet7
    # the kernel refuses this fillet: 1 mm, written as the material it takes off along each edge
    with BuildSketch(Plane(origin=(26.55, 3, -20), x_dir=(0, 0.39462211596391505, -0.918843504407667), z_dir=(-1, 0, 0))) as fillet7_piece_1:
        with BuildLine():
            CenterArc((FILLET7_R * 0.658847650478, FILLET7_R), FILLET7_R, 203.242408489, 66.757591511)
            Line((-FILLET7_R * 0.25999585393, FILLET7_R * 0.605377884037), (0, 0))
            Line((0, 0), (FILLET7_R * 0.658847650479, 0))
        make_face()
    extrude(amount=24.1, mode=Mode.SUBTRACT)
    with BuildSketch(Plane(origin=(26.55, 0, -20), x_dir=(0, 0, -1), z_dir=(-1, 0, 0))) as fillet7_piece_2:
        with BuildLine():
            CenterArc((FILLET7_R, -FILLET7_R), FILLET7_R, 90, 90)
            Line((0, -FILLET7_R), (0, 0))
            Line((0, 0), (FILLET7_R, 0))
        make_face()
    extrude(amount=24.1, mode=Mode.SUBTRACT)

    # Sketch12 → Boss-Extrude8 (add)
    with BuildSketch(Plane(origin=(0, 3, 0), x_dir=(1, 0, 0), z_dir=(0, 1, 0))):
        Polygon((0, 0), (-0.05, 0), (-0.05, -4), (-2.55, -4), (-2.55, 1), (0, 10), align=None)
        Polygon((29, 10), (29, 0), (29.05, 0), (29.05, -4), (31.55, -4), (31.55, 1), align=None)
    extrude(amount=-BOSS_EXTRUDE8_DEPTH)


solid = part_2.part
